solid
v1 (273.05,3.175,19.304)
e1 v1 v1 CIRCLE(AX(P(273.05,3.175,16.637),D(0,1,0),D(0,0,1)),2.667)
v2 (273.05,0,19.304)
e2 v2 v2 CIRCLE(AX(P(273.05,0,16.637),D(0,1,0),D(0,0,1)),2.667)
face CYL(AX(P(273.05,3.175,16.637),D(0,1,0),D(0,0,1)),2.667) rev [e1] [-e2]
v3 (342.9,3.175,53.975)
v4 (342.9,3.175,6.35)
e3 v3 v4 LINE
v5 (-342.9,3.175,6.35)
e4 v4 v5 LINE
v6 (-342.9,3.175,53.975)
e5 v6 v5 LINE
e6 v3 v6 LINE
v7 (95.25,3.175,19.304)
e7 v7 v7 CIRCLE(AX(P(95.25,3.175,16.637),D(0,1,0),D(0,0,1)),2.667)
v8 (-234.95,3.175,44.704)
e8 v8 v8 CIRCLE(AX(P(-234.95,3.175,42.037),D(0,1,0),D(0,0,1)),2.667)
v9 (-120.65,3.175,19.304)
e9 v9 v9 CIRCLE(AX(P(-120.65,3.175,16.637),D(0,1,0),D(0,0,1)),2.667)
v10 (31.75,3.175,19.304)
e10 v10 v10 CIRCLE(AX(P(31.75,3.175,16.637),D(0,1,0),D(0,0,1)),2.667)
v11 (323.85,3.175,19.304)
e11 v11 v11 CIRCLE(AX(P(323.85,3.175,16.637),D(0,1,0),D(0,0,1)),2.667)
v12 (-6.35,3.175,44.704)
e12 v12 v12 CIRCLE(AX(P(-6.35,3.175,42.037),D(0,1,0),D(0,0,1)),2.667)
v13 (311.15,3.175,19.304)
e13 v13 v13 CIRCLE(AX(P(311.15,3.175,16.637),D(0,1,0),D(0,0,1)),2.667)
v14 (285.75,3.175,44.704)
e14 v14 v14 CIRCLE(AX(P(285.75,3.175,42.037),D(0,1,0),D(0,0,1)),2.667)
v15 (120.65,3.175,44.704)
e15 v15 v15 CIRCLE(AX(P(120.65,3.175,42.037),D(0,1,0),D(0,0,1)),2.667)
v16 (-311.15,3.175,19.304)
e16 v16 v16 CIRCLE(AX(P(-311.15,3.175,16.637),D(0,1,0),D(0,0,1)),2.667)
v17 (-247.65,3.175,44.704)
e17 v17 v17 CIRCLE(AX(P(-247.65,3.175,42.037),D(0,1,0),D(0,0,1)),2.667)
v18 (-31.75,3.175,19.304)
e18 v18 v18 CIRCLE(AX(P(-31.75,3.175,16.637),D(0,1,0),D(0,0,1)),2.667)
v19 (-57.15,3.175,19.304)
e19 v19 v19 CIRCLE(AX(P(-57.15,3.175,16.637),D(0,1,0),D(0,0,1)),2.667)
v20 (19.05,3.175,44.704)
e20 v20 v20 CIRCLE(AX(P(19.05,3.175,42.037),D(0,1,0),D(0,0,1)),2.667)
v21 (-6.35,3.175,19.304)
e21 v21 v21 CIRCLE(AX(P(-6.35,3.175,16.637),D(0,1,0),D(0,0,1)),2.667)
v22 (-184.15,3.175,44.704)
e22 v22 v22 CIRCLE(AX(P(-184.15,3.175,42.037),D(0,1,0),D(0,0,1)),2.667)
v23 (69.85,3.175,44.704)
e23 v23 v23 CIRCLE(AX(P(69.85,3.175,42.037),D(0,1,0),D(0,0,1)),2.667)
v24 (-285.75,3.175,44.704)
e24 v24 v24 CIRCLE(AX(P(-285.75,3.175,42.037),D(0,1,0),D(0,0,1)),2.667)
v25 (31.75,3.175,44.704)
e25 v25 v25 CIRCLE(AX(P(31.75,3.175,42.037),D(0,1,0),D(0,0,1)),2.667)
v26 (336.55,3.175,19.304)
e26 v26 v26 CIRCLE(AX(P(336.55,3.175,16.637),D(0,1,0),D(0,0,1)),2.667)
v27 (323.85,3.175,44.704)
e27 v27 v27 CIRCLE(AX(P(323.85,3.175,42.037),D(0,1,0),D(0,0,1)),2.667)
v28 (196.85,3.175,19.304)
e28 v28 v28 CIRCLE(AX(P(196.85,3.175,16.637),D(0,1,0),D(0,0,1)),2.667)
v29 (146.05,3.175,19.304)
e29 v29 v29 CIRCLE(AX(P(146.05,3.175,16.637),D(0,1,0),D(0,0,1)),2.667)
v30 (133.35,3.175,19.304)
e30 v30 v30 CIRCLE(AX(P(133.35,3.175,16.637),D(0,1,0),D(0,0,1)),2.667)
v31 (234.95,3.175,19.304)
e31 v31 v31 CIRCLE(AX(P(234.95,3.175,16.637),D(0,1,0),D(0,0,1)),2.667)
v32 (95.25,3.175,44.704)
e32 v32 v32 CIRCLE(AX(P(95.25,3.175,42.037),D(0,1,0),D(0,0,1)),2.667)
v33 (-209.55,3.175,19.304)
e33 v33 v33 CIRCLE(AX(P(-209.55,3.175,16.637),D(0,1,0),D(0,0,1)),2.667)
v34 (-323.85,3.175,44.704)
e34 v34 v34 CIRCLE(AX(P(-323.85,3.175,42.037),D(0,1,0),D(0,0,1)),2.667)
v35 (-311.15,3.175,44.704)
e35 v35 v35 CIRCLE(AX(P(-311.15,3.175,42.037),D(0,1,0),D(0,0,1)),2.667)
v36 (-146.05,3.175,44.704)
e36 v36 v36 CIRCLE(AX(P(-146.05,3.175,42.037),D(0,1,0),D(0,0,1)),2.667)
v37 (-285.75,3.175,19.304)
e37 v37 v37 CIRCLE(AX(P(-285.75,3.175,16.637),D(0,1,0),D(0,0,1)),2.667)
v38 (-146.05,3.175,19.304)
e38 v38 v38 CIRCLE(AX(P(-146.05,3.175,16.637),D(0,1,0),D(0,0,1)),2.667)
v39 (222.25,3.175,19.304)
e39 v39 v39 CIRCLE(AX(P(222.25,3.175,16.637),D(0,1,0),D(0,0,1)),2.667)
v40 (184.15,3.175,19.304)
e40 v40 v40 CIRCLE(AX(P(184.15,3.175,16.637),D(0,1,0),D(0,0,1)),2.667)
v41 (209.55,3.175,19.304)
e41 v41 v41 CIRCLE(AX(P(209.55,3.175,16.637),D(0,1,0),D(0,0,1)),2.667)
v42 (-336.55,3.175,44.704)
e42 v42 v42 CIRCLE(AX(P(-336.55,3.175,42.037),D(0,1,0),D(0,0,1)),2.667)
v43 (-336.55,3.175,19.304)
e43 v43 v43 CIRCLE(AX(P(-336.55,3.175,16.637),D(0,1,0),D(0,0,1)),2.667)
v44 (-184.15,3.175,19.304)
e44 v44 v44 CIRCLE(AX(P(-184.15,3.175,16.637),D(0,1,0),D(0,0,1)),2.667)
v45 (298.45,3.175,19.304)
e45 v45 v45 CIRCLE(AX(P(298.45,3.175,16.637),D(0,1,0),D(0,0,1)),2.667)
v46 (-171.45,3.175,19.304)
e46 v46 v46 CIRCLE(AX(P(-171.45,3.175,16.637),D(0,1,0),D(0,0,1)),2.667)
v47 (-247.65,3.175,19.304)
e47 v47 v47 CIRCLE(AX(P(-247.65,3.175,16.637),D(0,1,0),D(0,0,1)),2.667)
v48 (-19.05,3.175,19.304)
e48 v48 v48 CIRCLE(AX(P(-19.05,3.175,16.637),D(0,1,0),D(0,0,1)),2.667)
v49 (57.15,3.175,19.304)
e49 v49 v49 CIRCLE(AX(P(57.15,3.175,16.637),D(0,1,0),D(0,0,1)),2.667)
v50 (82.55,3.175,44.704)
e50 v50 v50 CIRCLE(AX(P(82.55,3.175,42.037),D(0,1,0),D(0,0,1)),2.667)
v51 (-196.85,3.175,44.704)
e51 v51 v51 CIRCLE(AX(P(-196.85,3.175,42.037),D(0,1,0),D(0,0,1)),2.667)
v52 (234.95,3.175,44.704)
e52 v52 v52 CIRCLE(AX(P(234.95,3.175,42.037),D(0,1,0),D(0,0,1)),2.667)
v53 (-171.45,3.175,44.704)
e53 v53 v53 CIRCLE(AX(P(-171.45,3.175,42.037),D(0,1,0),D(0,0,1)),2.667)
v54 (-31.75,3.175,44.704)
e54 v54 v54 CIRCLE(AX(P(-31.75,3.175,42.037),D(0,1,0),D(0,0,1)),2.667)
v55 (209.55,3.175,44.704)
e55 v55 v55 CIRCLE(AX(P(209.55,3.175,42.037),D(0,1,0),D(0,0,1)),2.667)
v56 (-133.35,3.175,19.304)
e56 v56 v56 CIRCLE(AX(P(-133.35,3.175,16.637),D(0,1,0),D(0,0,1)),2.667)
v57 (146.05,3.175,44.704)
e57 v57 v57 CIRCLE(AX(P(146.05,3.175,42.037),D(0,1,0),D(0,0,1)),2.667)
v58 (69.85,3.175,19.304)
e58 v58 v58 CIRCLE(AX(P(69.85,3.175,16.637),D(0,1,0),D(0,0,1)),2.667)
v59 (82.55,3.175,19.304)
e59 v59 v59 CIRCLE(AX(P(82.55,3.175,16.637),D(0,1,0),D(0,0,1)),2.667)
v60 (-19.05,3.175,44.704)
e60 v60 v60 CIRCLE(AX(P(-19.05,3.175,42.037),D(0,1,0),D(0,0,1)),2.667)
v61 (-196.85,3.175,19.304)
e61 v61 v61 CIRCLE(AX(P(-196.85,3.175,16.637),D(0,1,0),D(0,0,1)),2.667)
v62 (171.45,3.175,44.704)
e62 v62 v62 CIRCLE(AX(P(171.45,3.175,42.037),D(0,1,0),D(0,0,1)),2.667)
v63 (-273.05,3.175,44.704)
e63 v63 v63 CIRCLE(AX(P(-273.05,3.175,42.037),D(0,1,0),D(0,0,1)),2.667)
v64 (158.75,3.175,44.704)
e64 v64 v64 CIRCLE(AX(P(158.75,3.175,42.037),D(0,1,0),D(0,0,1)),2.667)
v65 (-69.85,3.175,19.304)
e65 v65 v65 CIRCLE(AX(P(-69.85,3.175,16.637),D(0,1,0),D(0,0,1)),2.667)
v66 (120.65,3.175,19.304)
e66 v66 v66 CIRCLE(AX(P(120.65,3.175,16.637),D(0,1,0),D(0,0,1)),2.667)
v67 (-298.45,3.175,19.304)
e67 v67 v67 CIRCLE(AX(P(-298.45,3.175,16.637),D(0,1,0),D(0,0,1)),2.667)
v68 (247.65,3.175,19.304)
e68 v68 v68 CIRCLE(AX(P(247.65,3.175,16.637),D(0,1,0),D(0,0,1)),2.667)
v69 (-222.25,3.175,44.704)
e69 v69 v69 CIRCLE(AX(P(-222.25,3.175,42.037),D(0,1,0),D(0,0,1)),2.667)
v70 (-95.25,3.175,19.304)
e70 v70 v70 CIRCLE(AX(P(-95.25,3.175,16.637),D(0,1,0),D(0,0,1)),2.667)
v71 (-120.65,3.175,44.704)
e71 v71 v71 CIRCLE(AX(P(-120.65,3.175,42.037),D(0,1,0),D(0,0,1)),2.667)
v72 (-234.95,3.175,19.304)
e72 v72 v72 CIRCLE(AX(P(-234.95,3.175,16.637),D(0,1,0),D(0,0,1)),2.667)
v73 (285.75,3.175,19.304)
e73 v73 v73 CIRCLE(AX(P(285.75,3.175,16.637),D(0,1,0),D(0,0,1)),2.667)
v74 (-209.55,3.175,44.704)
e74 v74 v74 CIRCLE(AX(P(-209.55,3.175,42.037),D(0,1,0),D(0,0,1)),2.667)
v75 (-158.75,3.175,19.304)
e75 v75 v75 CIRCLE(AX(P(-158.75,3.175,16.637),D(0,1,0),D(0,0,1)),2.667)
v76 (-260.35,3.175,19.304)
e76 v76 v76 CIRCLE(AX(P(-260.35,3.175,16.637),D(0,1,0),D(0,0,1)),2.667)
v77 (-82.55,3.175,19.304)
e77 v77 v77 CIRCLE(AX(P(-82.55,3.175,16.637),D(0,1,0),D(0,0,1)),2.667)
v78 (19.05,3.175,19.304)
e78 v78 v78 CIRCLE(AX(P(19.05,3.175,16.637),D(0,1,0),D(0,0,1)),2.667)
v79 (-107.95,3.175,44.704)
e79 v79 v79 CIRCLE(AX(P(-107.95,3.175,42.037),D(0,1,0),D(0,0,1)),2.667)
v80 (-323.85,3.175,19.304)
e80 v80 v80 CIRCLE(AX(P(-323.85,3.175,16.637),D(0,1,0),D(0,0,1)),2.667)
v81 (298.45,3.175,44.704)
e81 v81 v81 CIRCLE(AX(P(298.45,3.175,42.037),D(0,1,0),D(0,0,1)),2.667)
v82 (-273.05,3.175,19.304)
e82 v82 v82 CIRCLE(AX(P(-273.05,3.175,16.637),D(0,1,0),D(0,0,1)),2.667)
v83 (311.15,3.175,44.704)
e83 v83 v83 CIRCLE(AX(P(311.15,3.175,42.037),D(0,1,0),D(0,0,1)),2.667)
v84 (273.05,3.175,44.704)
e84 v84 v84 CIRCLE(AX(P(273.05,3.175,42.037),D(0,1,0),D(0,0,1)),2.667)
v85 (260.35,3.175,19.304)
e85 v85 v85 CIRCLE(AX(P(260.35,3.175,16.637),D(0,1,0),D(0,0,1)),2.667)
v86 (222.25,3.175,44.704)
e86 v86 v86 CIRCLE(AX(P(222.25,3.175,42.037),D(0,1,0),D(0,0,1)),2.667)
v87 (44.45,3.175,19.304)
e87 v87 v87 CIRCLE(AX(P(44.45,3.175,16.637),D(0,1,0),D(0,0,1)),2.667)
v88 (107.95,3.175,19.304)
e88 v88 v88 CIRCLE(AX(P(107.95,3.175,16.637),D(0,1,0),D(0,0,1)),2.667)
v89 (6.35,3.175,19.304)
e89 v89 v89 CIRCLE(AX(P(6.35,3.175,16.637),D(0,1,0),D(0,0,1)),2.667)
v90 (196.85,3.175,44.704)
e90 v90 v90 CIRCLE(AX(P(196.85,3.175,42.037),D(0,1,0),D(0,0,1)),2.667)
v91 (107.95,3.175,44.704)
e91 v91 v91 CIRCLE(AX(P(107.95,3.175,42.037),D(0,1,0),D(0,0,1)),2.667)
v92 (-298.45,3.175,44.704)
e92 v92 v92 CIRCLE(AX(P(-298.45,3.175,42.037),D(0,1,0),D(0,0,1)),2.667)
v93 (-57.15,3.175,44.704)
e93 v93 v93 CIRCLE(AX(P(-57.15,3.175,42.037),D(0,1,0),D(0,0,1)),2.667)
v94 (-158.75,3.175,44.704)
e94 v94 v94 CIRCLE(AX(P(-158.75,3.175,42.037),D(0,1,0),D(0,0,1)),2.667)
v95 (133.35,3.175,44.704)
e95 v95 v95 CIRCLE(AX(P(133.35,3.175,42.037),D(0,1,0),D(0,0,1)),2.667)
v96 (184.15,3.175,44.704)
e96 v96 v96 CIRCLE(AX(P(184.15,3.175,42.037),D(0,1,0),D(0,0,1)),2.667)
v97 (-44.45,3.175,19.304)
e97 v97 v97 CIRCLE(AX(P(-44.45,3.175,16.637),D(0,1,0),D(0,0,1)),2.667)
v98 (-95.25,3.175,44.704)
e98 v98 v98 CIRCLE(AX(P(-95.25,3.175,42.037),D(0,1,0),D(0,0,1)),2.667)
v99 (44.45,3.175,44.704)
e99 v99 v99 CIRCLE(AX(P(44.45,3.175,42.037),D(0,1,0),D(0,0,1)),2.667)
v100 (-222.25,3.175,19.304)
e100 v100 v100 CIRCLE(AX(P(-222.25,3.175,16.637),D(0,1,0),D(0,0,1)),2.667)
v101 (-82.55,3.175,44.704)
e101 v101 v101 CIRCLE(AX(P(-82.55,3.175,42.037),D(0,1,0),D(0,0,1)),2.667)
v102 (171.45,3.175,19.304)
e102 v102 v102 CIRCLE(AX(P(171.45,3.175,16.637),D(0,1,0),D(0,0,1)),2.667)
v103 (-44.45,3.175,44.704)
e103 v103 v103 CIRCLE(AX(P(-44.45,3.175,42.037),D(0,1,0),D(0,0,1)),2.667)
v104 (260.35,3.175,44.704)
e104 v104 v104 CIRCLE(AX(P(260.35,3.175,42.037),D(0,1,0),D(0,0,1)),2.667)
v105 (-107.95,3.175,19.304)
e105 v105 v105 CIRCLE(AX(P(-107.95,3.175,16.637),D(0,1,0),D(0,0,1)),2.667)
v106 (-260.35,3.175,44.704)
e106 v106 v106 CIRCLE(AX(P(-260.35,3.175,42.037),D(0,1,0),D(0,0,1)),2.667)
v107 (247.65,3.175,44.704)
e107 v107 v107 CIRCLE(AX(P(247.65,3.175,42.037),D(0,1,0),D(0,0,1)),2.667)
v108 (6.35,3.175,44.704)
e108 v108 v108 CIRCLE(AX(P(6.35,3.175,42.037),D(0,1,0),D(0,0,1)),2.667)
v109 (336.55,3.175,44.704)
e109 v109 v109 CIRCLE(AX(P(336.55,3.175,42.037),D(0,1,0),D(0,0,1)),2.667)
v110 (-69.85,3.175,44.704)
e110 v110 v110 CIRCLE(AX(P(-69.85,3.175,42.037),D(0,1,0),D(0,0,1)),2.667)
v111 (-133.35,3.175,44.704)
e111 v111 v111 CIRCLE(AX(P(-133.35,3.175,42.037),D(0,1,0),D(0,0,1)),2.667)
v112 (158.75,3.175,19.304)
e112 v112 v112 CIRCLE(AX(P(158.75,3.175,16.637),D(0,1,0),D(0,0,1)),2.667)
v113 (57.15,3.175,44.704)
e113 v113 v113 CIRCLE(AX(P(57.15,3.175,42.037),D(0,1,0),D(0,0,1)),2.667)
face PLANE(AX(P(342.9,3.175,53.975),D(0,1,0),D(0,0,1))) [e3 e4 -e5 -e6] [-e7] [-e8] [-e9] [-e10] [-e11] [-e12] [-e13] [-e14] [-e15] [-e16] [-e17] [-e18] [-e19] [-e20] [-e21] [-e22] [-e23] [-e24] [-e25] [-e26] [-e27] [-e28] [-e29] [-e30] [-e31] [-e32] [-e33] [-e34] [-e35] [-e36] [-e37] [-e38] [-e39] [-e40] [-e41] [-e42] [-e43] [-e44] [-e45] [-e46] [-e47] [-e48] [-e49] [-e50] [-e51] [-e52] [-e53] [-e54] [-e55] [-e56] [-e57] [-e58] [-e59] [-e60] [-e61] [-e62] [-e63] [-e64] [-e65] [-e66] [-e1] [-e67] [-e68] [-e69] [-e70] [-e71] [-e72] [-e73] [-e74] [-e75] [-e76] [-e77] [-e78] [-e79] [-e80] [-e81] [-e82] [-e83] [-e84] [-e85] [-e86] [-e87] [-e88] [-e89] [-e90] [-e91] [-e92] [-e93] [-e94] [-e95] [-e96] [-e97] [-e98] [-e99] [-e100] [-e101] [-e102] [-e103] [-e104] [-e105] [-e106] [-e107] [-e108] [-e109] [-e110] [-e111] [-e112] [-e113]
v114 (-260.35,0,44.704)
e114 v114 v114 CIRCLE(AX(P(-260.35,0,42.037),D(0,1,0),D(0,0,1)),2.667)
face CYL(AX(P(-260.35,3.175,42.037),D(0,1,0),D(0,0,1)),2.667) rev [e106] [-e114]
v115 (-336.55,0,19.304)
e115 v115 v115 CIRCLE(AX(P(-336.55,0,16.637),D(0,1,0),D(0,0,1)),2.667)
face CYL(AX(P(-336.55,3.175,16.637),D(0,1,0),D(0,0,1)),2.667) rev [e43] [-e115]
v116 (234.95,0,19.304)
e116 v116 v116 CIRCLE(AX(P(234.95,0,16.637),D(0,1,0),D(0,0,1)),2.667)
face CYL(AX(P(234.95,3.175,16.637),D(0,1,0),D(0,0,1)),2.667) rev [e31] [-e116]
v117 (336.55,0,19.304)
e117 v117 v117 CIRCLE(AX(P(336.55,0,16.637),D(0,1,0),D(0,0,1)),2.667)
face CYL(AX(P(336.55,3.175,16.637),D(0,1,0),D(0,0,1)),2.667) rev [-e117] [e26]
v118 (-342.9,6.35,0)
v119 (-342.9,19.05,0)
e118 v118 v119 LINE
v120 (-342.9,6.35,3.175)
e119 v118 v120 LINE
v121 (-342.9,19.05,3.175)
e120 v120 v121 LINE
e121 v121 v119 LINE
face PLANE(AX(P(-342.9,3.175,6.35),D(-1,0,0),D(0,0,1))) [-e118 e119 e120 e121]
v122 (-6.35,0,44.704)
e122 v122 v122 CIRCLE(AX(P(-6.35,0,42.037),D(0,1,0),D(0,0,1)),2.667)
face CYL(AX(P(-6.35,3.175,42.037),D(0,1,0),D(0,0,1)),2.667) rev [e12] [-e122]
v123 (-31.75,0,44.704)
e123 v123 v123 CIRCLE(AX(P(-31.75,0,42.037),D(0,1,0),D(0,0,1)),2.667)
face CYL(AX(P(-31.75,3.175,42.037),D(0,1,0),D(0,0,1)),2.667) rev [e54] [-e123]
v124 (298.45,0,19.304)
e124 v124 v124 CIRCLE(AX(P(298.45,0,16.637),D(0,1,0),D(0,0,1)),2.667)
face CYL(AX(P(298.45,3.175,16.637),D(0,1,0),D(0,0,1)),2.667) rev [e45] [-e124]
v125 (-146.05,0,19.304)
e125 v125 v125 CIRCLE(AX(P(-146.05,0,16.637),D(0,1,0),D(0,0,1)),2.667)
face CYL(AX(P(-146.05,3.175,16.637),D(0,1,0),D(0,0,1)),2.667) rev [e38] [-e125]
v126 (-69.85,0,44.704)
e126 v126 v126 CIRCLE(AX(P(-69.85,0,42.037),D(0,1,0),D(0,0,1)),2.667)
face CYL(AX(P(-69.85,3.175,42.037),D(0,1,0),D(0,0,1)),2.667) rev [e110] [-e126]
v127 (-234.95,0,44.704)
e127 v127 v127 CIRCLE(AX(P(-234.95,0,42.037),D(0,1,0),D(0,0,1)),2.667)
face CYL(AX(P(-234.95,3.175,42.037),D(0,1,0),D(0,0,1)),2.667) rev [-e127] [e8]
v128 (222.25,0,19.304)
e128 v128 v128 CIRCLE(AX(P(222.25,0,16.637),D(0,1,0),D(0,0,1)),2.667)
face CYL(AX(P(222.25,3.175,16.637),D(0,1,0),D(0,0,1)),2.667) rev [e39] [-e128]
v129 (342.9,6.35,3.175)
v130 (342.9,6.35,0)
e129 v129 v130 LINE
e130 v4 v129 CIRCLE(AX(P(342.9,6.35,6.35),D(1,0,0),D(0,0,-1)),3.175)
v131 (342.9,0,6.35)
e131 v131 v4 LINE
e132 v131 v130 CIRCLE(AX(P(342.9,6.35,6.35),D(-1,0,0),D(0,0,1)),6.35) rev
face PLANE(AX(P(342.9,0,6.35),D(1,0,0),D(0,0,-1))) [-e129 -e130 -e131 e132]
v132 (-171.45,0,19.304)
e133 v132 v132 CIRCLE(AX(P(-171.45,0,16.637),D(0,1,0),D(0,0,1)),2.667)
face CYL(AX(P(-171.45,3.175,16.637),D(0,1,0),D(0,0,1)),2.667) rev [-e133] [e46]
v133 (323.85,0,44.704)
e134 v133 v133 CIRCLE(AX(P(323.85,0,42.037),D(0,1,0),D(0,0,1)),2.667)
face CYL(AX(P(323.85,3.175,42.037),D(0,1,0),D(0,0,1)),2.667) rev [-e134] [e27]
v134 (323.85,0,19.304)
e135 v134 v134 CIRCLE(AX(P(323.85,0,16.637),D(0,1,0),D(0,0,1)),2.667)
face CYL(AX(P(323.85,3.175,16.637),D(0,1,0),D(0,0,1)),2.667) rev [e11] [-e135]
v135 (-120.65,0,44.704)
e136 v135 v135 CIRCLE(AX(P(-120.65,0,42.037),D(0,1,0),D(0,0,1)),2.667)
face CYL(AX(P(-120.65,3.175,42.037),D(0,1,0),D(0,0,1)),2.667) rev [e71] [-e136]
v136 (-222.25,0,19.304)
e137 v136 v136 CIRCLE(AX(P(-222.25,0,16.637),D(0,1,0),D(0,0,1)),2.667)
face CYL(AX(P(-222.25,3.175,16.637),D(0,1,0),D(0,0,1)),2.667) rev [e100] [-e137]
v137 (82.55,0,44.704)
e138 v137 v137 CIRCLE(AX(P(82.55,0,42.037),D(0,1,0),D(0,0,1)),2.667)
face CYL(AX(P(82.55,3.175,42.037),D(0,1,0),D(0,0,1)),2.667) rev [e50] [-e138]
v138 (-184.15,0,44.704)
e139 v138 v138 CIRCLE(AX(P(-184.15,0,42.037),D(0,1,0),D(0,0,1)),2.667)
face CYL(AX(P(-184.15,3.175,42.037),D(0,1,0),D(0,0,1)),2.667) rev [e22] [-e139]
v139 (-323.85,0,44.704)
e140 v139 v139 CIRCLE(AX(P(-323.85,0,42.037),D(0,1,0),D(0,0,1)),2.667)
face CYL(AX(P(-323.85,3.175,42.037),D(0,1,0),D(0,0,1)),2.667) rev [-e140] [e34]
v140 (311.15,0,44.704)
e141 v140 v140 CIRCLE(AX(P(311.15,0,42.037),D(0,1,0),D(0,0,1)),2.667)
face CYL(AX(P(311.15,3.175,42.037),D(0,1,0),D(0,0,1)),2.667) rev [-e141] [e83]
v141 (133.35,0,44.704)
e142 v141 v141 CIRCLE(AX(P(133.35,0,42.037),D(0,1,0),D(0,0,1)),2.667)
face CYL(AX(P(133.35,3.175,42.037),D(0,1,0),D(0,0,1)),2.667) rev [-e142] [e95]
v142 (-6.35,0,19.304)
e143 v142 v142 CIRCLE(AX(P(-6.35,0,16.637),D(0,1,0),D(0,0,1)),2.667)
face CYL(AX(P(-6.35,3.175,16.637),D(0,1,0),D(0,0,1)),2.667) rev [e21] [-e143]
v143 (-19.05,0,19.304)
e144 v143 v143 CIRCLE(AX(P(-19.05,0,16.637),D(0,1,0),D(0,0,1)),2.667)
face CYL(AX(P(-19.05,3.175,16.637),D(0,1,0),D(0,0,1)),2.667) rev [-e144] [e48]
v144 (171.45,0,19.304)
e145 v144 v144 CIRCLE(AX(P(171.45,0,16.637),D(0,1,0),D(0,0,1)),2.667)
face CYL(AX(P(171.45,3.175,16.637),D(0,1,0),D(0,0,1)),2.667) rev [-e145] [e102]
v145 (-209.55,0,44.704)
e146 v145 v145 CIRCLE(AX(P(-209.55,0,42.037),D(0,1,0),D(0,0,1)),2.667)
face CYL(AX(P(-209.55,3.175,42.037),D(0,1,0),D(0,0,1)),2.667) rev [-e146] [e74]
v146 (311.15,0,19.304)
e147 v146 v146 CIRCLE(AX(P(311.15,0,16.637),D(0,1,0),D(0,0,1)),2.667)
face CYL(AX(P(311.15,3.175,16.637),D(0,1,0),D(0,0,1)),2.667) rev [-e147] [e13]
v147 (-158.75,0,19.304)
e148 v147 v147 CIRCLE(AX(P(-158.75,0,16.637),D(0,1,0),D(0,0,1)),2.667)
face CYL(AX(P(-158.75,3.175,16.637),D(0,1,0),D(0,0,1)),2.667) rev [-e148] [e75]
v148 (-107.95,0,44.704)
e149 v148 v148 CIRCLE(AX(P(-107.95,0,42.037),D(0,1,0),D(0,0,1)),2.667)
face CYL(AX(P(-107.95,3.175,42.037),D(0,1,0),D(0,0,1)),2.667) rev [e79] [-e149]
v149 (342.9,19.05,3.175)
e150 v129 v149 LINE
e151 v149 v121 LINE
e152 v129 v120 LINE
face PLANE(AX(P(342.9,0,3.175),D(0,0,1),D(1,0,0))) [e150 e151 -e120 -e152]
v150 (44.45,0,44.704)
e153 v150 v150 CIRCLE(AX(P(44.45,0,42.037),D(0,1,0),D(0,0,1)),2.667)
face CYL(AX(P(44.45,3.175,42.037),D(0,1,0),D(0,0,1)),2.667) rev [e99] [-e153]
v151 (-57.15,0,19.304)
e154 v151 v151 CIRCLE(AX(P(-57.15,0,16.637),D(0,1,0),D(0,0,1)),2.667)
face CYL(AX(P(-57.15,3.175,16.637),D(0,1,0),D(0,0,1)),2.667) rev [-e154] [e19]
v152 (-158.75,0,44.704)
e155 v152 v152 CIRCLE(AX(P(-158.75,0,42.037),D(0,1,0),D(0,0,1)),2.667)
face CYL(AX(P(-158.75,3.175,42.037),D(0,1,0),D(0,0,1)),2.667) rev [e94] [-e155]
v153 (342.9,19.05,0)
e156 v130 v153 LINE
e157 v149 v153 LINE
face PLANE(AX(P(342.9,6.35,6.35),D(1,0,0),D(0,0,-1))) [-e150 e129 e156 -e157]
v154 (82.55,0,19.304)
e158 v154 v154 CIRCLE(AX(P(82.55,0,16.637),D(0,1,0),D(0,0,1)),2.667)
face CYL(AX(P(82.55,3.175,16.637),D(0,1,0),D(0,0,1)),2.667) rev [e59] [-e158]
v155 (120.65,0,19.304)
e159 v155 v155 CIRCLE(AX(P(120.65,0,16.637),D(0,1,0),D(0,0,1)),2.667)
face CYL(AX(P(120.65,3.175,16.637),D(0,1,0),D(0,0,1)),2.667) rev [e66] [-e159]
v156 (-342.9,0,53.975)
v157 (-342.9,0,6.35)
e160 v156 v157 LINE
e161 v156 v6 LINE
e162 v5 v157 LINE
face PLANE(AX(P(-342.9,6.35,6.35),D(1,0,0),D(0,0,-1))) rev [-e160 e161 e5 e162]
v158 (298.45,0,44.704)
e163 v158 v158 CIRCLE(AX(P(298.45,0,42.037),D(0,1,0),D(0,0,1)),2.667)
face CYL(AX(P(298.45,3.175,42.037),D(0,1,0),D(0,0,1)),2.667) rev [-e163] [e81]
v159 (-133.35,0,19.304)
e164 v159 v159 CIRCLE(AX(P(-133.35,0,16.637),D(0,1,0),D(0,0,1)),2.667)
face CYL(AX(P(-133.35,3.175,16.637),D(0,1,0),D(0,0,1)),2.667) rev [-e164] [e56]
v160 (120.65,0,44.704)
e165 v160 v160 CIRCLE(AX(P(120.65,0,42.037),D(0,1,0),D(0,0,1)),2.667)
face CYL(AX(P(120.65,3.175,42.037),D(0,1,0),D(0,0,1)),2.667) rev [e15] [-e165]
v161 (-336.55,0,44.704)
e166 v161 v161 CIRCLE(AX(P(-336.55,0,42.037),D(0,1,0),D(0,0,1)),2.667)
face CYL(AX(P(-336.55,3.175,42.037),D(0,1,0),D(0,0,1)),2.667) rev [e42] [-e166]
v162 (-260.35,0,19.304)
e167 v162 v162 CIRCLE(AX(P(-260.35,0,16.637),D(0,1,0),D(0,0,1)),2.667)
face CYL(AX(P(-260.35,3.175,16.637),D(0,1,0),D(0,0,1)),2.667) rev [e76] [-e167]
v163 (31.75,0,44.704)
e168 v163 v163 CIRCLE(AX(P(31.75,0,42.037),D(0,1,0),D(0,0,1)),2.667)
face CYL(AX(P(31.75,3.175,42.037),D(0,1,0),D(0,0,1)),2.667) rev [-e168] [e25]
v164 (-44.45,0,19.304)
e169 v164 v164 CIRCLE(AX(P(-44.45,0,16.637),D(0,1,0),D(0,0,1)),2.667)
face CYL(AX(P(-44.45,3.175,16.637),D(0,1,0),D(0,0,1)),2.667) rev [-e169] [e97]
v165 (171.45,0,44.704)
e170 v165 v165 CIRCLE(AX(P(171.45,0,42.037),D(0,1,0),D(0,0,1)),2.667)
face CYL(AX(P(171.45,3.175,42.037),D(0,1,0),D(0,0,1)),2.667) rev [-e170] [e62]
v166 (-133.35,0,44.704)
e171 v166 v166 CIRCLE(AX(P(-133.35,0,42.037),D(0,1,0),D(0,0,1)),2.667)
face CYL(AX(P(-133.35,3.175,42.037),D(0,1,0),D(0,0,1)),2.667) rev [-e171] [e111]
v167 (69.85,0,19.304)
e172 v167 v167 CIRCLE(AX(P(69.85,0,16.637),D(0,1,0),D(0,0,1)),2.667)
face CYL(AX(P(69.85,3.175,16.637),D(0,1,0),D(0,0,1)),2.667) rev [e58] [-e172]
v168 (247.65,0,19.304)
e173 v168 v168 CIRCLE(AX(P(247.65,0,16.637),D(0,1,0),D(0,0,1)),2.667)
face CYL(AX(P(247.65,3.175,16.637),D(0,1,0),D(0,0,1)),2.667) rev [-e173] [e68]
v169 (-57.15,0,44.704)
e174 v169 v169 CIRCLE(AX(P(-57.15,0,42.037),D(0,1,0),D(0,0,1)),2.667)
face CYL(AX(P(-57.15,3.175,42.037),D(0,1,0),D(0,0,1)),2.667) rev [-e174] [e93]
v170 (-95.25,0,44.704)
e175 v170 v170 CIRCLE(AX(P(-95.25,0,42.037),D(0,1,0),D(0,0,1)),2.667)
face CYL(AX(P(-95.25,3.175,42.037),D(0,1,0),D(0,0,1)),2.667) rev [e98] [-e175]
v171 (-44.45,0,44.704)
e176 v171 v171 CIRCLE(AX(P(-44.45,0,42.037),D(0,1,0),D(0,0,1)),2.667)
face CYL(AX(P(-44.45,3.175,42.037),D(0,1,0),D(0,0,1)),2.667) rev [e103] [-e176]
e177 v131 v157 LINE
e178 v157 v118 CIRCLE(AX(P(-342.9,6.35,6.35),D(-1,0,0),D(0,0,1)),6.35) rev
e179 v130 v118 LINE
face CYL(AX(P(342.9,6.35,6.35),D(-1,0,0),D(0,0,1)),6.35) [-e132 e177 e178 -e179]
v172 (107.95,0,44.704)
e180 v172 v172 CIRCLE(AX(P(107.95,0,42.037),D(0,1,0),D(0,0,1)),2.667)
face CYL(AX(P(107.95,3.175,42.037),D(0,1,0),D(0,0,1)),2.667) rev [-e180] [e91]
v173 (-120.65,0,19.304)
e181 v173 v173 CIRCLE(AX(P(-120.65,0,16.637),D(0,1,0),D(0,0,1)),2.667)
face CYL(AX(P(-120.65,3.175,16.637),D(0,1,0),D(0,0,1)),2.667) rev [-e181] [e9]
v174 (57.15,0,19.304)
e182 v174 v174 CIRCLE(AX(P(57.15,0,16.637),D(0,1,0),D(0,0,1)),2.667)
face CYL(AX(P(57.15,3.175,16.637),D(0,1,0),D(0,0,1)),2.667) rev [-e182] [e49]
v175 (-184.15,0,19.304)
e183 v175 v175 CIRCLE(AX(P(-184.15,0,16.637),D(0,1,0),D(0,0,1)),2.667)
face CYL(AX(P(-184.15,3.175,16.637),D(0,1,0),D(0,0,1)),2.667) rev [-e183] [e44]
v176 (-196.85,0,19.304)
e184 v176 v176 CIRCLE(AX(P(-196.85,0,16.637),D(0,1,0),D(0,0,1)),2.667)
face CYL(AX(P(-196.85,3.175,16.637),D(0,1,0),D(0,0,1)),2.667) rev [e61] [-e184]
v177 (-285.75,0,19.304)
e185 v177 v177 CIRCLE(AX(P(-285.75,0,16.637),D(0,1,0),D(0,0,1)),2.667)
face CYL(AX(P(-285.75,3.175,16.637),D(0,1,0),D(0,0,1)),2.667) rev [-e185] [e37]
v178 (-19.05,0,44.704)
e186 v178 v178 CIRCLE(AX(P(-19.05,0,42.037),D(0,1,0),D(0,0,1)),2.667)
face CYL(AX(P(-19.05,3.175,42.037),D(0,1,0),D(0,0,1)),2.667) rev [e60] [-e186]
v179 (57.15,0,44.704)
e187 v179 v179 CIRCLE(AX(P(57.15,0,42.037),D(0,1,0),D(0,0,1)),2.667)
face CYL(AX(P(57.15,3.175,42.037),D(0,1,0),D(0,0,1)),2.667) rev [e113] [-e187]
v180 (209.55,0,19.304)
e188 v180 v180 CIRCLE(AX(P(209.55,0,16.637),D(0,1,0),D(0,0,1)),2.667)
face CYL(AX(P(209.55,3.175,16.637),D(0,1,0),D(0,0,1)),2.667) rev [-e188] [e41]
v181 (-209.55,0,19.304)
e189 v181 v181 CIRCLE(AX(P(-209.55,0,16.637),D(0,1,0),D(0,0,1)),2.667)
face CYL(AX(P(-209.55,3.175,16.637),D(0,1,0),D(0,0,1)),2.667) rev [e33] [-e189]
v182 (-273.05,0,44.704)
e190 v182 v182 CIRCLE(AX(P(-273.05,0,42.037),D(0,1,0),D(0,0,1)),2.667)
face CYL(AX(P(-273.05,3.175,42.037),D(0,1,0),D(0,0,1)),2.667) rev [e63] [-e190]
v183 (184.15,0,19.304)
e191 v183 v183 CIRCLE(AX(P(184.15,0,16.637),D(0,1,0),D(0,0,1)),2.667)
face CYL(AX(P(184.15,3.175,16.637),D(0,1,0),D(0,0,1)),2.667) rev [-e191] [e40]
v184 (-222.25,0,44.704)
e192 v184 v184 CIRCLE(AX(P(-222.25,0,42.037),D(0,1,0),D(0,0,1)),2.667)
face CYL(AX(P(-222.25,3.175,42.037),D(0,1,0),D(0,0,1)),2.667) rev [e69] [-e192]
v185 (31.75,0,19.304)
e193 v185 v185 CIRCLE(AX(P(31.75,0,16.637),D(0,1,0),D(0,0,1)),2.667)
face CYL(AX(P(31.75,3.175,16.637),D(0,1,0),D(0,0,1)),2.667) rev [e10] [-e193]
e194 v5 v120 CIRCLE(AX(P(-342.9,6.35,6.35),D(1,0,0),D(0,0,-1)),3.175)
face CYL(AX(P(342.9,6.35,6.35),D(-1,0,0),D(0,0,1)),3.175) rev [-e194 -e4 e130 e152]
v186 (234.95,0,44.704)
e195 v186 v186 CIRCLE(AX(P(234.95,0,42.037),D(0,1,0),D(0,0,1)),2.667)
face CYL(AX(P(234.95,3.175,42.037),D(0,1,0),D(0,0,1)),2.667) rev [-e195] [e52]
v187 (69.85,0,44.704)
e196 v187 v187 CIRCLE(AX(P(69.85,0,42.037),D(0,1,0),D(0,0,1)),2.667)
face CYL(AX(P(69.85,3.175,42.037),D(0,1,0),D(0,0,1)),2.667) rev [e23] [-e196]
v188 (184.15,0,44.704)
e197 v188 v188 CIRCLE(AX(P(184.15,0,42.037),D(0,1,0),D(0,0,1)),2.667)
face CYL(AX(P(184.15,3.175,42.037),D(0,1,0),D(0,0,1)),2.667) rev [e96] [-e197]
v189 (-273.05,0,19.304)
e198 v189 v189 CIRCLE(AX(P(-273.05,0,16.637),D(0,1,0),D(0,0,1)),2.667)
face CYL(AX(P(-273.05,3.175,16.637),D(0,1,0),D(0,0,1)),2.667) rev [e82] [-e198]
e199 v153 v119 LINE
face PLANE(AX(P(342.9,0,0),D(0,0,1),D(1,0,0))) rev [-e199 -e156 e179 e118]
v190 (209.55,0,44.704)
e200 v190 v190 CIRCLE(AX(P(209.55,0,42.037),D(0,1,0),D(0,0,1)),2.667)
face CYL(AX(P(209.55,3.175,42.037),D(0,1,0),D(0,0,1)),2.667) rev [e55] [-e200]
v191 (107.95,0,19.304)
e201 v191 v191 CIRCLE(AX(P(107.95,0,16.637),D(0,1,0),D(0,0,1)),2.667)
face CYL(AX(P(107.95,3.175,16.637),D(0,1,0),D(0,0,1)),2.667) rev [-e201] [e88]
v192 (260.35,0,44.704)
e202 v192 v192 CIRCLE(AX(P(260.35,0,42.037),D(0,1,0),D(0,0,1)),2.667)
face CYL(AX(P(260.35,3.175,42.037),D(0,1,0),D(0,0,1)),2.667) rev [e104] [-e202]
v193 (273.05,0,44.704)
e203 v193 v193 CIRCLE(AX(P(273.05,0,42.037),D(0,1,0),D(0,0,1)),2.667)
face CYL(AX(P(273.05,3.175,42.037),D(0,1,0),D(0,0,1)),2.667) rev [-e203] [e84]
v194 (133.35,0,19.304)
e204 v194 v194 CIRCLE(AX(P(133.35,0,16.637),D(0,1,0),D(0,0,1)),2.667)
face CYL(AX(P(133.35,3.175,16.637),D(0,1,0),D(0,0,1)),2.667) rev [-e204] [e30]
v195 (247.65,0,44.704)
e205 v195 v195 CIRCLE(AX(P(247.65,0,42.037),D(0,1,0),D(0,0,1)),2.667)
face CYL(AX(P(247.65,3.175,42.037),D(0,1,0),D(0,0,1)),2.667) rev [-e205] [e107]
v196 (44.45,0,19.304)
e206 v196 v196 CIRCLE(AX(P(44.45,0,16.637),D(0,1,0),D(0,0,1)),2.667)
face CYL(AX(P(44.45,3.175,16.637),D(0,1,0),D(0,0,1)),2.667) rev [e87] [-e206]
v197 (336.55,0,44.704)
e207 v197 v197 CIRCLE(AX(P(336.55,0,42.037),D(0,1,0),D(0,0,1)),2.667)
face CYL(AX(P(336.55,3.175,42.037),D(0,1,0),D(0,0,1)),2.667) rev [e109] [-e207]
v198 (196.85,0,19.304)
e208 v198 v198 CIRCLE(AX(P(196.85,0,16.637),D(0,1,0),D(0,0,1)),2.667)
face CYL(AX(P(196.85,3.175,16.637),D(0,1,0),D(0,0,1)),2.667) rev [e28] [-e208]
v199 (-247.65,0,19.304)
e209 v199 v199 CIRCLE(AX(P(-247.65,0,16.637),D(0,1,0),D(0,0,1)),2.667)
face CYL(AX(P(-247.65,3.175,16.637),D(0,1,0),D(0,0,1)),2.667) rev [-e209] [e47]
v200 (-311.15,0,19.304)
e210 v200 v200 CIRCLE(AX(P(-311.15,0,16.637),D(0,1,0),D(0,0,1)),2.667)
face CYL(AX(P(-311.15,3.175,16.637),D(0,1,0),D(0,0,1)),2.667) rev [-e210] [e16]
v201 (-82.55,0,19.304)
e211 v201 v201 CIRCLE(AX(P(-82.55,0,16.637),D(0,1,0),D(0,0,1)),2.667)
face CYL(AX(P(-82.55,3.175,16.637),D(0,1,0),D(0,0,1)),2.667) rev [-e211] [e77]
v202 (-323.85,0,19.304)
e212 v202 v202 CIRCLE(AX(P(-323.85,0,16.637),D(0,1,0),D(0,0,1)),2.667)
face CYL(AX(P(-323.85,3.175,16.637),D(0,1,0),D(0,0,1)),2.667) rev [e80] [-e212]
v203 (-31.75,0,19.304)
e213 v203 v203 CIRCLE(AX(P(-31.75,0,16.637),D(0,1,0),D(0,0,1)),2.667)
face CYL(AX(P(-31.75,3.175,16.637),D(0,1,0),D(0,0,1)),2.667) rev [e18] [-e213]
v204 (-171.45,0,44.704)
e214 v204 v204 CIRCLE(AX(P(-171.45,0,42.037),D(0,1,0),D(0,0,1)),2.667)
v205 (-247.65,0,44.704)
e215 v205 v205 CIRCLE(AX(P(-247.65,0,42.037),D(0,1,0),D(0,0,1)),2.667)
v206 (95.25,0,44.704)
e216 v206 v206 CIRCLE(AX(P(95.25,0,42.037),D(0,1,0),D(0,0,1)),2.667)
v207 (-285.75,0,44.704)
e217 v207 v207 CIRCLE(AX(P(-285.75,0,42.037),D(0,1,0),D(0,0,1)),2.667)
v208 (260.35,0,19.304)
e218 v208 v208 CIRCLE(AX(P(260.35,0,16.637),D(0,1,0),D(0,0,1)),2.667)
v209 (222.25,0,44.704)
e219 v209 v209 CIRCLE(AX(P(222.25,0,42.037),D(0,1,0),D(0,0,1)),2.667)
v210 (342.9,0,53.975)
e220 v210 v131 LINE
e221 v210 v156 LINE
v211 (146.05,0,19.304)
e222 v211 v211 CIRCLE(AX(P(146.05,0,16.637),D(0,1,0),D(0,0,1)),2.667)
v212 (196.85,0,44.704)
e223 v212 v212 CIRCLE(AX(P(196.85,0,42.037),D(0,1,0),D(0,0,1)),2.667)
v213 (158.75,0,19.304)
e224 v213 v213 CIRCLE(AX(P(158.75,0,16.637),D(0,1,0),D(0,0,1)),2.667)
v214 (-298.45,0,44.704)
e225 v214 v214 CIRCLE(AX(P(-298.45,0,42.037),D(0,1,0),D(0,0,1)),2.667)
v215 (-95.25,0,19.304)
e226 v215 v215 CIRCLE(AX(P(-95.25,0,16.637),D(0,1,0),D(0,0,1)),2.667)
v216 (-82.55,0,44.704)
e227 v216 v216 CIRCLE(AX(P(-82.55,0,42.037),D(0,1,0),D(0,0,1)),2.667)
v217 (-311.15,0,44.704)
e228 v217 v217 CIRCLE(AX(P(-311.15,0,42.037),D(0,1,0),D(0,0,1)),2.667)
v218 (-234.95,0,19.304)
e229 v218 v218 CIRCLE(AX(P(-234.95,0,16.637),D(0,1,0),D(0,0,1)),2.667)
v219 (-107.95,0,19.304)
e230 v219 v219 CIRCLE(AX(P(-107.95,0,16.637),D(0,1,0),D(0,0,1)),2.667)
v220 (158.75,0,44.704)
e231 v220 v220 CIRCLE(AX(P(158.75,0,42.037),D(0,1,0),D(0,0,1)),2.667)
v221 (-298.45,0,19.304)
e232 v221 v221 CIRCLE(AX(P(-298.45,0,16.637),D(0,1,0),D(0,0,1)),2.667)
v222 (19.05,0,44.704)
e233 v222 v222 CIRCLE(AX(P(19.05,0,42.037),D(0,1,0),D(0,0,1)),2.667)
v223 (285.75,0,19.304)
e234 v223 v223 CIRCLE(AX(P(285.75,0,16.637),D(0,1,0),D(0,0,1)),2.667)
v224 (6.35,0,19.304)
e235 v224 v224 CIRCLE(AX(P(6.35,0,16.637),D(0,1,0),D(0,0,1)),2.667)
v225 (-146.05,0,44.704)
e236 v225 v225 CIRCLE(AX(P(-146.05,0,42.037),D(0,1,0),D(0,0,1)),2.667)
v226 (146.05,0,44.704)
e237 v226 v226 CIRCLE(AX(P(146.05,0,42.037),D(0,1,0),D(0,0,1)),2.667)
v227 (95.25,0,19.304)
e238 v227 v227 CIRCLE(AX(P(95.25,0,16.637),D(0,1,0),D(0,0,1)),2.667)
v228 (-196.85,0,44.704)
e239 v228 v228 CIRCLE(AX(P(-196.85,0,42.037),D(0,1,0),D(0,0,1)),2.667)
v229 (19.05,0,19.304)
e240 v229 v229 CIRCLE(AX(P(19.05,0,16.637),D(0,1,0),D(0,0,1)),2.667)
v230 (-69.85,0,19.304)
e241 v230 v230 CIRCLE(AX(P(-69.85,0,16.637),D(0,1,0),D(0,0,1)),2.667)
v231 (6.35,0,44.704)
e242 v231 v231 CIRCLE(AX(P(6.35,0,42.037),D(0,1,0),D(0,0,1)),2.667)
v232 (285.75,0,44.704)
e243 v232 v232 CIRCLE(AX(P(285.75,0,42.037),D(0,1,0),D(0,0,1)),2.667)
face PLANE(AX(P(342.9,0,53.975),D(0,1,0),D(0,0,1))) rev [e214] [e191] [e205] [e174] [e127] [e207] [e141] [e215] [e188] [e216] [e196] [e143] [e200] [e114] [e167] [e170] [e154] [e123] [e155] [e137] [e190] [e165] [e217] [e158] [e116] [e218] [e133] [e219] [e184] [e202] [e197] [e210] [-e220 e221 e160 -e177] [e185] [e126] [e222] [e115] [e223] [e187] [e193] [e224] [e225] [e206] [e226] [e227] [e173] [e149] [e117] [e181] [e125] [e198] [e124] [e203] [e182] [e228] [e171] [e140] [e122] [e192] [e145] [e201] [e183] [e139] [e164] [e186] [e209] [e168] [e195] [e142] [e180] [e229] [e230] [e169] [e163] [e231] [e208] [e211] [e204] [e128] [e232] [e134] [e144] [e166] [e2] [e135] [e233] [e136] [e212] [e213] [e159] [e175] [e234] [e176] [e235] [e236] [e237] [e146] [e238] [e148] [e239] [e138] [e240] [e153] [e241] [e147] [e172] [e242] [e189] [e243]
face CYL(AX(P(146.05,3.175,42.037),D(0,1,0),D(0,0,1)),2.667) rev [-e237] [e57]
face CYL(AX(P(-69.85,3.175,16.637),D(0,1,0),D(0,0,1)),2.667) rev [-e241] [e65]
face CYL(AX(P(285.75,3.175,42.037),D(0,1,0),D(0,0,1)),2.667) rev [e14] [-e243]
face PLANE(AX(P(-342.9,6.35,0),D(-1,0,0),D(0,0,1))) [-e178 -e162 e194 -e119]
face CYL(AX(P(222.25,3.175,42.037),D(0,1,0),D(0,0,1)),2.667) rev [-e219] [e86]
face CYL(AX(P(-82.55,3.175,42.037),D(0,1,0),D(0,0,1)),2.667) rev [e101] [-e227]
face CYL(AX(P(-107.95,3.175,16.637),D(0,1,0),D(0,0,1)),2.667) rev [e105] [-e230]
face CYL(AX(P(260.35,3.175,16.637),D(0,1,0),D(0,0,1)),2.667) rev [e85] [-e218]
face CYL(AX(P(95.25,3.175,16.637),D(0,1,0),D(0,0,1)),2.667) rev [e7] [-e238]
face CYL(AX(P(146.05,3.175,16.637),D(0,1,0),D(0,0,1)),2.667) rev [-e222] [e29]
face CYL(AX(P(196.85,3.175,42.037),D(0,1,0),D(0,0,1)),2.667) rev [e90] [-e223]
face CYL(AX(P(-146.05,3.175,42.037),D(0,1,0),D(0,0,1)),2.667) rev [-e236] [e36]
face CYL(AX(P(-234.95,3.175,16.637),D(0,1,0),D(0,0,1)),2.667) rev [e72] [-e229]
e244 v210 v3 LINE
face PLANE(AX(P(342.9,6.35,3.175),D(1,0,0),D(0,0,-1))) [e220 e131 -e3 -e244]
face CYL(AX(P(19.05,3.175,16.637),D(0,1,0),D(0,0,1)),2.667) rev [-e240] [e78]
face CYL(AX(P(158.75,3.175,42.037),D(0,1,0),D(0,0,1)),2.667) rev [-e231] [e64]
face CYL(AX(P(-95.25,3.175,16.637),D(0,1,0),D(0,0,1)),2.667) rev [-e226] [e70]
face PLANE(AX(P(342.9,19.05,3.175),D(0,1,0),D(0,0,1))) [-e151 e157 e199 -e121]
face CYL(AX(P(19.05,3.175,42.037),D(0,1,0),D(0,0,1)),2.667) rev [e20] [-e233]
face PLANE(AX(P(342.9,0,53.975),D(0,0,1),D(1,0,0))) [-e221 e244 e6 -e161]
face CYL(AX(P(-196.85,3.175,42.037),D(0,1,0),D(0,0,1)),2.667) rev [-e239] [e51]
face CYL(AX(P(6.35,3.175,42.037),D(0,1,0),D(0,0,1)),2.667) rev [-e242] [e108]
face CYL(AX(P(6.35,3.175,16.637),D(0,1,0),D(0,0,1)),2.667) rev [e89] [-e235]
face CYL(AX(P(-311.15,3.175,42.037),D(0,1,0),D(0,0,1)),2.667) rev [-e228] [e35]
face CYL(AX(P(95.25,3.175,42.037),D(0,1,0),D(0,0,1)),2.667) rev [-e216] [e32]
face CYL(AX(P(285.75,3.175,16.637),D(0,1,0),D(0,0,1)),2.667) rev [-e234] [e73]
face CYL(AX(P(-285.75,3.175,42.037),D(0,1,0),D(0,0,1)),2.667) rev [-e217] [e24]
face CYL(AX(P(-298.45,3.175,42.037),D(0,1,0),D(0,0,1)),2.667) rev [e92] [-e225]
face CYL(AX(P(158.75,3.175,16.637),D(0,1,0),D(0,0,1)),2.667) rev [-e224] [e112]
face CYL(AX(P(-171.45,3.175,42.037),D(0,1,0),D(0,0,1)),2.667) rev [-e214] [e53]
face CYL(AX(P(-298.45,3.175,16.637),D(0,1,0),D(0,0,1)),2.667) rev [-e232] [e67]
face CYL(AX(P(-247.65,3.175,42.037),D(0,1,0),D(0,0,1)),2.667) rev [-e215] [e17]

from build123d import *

# Parameters (mm, degrees)
BASE_FLANGE1_DEPTH     = 342.9
F_10_CLEARANCE_HOLE1_D = 5.334
LPATTERN1_COUNT        = 54
LPATTERN1_PITCH        = 12.7


# Sheet-metal steps are written as plain solids
with BuildPart() as part:
    # Sketch1 → Base-Flange1 (new, symmetric)
    with BuildSketch(Plane(origin=(0, 0, 0), x_dir=(0, 0, -1), z_dir=(1, 0, 0))):
        with BuildLine():
            Line((-53.975, 0), (-6.35, 0))
            ThreePointArc((-6.35, 0), (-1.859871939, 1.859871939), (0, 6.35))
            Line((0, 6.35), (0, 19.05))
            Line((0, 19.05), (-3.175, 19.05))
            Line((-3.175, 19.05), (-3.175, 6.35))
            ThreePointArc((-3.175, 6.35), (-4.10493597, 4.10493597), (-6.35, 3.175))
            Line((-6.35, 3.175), (-53.975, 3.175))
            Line((-53.975, 3.175), (-53.975, 0))
        make_face()
    extrude(amount=BASE_FLANGE1_DEPTH, both=True)

    # #10 Clearance Hole1 (through all)
    with Locations(Plane(origin=(0, 3.175, 0), x_dir=(1, 0, 0), z_dir=(0, 1, 0))):
        with Locations((-336.55, -42.037), (-336.55, -16.637)):
            f_10_clearance_hole1 = Hole(F_10_CLEARANCE_HOLE1_D / 2)

    # LPattern1: #10 Clearance Hole1 ×54
    with Locations(*[(i * LPATTERN1_PITCH, 0, 0) for i in range(1, LPATTERN1_COUNT)]):
        add(f_10_clearance_hole1, mode=Mode.SUBTRACT)


solid = part.part
